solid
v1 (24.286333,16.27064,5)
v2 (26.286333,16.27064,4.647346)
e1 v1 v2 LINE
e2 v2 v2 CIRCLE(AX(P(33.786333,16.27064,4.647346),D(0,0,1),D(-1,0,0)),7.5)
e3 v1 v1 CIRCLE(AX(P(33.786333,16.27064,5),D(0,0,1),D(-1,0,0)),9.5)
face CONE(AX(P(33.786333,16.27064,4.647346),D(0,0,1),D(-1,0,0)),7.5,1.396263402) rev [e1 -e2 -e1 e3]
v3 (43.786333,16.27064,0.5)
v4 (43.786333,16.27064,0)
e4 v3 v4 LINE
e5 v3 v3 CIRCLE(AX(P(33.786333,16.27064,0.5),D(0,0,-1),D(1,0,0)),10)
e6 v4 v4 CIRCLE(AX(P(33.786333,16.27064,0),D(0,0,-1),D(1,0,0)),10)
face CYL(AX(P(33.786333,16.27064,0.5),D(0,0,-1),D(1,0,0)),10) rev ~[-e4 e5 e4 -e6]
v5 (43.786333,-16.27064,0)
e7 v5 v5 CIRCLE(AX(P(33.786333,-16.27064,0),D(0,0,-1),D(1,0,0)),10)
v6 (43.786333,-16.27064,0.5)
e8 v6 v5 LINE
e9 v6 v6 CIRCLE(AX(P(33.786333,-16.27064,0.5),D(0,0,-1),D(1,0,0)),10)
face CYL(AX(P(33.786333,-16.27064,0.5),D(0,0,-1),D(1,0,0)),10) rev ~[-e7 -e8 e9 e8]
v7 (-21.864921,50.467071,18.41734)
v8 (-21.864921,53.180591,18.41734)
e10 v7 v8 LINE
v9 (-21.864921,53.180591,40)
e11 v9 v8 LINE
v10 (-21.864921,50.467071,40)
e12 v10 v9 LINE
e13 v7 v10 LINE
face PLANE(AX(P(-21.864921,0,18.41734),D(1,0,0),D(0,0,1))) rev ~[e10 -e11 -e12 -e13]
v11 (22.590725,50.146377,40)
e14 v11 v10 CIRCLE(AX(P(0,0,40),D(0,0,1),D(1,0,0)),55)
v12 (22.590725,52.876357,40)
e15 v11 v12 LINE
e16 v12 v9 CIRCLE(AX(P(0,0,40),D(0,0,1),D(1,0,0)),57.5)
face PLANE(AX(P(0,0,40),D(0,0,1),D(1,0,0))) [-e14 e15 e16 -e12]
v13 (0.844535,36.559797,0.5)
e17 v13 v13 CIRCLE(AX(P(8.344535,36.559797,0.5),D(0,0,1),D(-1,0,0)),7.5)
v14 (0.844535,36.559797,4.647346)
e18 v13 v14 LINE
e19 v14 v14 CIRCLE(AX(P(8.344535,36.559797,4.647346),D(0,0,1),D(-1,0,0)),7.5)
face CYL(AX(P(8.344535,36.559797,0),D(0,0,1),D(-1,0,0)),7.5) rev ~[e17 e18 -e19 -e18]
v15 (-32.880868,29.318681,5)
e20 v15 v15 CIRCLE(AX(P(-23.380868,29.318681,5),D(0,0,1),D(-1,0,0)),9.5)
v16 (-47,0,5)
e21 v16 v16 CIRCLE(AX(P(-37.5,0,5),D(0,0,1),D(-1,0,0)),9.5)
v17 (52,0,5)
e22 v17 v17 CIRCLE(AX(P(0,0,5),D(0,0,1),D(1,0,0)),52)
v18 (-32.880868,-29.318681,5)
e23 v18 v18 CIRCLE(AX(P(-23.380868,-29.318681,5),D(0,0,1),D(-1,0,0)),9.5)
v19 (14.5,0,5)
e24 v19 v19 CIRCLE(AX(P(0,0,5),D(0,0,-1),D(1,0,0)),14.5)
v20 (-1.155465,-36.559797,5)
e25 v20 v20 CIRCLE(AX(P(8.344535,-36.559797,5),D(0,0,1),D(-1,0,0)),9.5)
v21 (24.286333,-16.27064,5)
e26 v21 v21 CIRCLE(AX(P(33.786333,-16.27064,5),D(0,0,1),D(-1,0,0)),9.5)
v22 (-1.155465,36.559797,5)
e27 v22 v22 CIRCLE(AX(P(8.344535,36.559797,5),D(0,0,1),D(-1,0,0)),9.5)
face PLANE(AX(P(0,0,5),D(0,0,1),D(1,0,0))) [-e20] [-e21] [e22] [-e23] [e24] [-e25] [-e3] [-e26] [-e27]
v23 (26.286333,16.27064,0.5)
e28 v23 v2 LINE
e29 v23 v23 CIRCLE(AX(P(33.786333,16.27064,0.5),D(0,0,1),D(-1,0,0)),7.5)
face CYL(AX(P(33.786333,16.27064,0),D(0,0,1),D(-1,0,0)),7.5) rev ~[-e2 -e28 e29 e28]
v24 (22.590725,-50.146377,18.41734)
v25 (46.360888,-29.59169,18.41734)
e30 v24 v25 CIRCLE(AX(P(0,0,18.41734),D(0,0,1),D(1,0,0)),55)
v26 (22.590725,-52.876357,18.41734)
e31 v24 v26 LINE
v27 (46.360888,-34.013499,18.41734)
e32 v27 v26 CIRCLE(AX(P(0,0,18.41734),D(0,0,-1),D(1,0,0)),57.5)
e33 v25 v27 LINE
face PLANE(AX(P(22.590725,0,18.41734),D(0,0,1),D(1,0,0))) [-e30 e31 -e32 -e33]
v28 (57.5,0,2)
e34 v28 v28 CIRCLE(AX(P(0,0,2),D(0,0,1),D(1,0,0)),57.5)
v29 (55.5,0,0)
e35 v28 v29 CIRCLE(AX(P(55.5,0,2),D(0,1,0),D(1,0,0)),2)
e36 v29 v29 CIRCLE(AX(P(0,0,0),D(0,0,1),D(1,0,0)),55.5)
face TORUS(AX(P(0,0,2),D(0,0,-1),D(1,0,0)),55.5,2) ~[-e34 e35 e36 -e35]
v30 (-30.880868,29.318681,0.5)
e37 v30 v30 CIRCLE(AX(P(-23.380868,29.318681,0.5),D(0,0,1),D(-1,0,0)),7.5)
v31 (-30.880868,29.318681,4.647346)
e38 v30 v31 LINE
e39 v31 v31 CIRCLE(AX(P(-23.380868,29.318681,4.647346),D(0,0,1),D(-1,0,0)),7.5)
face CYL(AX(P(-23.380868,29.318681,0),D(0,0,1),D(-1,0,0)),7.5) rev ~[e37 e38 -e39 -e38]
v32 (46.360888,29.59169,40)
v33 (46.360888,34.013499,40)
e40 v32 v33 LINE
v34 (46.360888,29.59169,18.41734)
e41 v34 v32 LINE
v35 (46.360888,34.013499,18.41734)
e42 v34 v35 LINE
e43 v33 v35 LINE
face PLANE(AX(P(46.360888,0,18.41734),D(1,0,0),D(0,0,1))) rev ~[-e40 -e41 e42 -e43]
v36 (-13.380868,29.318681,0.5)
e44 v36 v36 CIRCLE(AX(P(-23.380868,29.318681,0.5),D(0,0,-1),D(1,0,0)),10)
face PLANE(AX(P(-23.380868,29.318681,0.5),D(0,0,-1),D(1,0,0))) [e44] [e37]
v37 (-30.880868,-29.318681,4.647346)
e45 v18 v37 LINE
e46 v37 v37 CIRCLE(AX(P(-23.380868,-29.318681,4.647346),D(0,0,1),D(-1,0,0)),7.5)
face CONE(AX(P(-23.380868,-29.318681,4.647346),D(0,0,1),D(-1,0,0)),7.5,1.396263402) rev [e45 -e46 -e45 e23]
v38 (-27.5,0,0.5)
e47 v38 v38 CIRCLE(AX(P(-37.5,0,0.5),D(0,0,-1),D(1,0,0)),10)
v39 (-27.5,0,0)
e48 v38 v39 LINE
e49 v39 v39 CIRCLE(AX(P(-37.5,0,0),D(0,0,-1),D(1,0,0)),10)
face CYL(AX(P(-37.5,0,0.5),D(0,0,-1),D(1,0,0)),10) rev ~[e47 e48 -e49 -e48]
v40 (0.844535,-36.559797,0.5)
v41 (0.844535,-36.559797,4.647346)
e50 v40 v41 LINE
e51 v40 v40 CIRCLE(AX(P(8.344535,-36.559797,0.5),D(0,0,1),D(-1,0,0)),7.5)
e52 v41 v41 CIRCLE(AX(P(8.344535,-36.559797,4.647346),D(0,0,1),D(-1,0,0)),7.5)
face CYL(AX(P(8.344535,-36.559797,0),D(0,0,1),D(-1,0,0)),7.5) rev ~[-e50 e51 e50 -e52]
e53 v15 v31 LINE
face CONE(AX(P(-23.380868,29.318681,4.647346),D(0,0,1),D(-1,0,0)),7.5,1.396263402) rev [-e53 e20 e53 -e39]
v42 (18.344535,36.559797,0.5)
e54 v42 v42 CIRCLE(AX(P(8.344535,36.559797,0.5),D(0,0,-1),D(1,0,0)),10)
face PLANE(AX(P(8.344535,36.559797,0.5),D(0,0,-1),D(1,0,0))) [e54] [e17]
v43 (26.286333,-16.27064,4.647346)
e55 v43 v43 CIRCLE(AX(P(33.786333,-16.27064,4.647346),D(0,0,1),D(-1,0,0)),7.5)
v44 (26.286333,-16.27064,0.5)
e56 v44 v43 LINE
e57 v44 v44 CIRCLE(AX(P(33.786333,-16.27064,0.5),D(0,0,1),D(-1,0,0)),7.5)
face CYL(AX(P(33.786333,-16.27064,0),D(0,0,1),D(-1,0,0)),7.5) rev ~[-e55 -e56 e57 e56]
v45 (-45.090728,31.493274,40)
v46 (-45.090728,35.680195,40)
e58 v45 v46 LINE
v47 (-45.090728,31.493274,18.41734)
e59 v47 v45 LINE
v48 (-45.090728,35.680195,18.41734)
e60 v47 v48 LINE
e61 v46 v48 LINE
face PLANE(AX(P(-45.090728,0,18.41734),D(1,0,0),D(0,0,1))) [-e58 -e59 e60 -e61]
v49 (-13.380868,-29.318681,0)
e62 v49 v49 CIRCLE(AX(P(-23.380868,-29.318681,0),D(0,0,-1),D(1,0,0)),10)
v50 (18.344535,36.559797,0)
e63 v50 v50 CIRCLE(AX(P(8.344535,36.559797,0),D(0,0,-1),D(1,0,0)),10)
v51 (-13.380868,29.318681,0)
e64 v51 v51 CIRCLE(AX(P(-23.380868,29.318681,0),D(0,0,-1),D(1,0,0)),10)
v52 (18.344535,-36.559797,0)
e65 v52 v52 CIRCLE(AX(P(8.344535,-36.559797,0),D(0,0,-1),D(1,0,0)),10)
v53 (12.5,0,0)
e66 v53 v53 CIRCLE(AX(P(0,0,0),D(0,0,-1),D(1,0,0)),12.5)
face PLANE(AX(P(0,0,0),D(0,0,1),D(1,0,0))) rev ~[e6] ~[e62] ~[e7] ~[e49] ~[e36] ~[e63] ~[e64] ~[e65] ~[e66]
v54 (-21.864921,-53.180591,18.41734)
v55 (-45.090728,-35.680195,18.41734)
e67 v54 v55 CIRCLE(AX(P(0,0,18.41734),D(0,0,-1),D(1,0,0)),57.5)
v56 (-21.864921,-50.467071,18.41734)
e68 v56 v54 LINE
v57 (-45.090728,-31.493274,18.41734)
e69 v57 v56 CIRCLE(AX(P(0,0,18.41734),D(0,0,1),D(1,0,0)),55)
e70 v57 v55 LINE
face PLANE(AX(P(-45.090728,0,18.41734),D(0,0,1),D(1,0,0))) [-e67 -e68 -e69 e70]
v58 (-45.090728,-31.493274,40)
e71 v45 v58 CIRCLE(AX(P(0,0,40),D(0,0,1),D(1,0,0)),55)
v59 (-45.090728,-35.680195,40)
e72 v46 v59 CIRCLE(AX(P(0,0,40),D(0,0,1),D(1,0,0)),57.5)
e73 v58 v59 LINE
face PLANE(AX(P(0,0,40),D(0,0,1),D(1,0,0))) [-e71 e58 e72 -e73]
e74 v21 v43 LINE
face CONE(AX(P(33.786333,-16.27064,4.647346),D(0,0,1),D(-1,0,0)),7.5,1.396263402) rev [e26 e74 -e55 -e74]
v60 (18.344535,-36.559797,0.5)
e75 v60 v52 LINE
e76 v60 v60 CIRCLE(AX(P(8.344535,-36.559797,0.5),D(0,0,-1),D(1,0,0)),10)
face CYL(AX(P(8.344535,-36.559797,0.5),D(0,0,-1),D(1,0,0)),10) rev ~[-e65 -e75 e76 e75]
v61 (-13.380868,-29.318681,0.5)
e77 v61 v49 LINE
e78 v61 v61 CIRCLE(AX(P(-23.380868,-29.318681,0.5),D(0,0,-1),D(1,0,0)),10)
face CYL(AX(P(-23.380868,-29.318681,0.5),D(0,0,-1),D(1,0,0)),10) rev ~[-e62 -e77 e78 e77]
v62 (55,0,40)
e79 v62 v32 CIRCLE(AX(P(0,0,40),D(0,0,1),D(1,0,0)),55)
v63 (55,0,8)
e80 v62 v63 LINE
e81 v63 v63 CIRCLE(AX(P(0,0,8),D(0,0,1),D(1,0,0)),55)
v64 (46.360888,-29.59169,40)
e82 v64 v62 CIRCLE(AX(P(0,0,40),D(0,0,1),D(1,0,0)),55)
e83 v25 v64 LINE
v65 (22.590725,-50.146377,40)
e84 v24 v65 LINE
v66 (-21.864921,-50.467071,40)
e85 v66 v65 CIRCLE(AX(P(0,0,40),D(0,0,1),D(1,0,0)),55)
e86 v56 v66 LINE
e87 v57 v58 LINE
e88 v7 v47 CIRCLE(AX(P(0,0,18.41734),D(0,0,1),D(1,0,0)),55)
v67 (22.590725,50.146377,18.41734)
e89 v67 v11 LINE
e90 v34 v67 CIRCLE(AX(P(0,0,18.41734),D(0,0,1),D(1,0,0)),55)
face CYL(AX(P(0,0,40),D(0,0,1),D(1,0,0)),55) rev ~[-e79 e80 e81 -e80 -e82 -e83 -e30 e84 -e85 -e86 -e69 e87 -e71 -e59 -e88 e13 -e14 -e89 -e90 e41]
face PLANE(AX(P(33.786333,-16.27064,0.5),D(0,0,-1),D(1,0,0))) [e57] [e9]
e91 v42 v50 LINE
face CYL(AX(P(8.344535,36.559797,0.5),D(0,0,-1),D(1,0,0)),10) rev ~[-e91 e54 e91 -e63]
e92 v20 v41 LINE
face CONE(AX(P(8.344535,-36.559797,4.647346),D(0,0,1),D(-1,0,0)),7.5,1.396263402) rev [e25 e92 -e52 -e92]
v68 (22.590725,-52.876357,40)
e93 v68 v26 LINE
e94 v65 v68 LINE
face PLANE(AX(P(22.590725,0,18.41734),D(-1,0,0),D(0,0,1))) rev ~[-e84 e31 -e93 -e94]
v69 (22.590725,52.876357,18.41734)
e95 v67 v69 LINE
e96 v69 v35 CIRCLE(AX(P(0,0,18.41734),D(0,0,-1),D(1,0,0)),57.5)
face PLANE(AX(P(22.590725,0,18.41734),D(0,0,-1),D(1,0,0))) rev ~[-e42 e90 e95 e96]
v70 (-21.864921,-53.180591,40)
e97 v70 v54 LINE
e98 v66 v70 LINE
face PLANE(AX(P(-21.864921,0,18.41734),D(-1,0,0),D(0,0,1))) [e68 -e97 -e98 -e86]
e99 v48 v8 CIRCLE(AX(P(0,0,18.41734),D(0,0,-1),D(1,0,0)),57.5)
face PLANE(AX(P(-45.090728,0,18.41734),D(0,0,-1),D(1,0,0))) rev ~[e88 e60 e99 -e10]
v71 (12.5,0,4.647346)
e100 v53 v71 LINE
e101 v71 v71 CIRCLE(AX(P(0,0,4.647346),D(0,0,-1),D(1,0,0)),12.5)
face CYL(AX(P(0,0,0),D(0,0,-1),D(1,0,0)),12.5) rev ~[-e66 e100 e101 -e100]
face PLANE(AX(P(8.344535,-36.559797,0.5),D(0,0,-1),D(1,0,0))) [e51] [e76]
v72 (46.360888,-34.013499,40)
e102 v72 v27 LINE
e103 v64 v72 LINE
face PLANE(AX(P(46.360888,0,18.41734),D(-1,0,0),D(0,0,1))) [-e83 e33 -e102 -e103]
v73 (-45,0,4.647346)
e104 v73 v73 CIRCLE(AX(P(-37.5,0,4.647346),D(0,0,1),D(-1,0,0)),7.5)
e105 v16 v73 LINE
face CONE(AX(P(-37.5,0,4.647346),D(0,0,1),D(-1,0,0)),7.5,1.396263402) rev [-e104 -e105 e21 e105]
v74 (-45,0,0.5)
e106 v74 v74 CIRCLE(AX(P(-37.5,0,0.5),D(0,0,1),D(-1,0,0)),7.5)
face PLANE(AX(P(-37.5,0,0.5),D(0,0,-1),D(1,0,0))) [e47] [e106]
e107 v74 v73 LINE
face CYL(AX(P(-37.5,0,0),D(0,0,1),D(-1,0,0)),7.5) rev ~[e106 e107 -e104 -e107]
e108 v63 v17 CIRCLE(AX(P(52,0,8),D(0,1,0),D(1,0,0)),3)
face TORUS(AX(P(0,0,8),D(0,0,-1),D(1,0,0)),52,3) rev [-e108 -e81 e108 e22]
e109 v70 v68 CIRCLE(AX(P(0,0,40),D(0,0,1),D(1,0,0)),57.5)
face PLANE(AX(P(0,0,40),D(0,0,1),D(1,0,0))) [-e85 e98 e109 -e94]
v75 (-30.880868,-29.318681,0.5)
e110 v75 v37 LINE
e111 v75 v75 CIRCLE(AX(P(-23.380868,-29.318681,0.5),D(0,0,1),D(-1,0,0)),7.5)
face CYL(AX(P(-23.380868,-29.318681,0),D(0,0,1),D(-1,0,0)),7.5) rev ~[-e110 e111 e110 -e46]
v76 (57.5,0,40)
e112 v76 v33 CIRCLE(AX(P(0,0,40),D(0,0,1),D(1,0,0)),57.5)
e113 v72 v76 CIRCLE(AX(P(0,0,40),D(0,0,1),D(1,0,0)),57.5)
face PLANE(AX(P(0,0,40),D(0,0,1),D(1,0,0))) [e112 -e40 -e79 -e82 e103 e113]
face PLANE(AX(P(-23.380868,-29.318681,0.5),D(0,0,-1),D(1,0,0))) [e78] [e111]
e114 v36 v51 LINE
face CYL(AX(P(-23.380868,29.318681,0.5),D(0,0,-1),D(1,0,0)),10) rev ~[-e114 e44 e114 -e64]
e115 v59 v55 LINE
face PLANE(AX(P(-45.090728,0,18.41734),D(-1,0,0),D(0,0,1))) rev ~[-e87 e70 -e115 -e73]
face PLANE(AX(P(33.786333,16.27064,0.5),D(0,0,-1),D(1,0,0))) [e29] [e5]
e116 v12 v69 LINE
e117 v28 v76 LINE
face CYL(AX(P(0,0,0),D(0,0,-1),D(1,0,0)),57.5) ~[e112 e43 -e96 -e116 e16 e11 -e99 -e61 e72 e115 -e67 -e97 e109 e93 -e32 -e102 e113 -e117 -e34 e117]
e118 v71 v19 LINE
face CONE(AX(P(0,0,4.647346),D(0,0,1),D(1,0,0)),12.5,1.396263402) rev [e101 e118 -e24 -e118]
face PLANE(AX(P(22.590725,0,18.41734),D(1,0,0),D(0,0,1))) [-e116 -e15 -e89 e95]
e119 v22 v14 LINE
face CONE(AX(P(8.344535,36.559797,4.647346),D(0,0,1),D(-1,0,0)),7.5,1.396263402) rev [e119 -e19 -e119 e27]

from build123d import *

# Parameters (mm, degrees)
F0_R           = 57.5
F1_DEPTH       = 40
F2_R           = 55
F3_DEPTH       = 35
F4_R           = 3
F5_R           = 2
F6_R           = 12.5
F7_DEPTH       = 40.001
F9_D           = 15
F9_CBORE_D     = 20
F9_CBORE_DEPTH = 0.5
F10_C1_SIZE2   = 2
F10_C1_SIZE    = 0.3526539614
F10_C2_SIZE2   = 0.3526539614
F10_C2_SIZE    = 2
F10_C3_SIZE2   = 0.3526539614
F10_C3_SIZE    = 2
F10_C4_SIZE2   = 0.3526539614
F10_C4_SIZE    = 2
F10_C5_SIZE2   = 0.3526539614
F10_C5_SIZE    = 2
F10_C6_SIZE2   = 0.3526539614
F10_C6_SIZE    = 2
F10_C7_SIZE2   = 0.3526539614
F10_C7_SIZE    = 2
F10_C8_SIZE2   = 0.3526539614
F10_C8_SIZE    = 2
F11_W          = 23.2258066535
F11_H          = 27.9435478151
F11_W_2        = 23.7701628357
F11_H_2        = 28.1250029802
F12_DEPTH      = 57.5010001
F12_DEPTH_BACK = 57.5010001


with BuildPart() as f1:
    # F0 (on Top) → F1 (new body)
    with BuildSketch(Plane.XY):
        Circle(F0_R)
    extrude(amount=F1_DEPTH)

    # F2 (on face) → F3 (cut)
    with BuildSketch(Plane.XY.offset(40)):
        Circle(F2_R)
    extrude(amount=-F3_DEPTH, mode=Mode.SUBTRACT)

    # F4
    f4_edges = [f1.edges().sort_by_distance(p)[0] for p in [
        (-55, 0, 5),
    ]]
    fillet(f4_edges, radius=F4_R)

    # F5
    f5_edges = [f1.edges().sort_by_distance(p)[0] for p in [
        (-57.5, 0, 0),
    ]]
    fillet(f5_edges, radius=F5_R)

    # F6 (on face) → F7 (cut, through all)
    with BuildSketch(Plane(origin=(0, 0, 0), x_dir=(1, 0, 0), z_dir=(0, 0, -1))):
        Circle(F6_R)
    extrude(amount=-F7_DEPTH, mode=Mode.SUBTRACT)

    # F9 (through all)
    with Locations(Plane(origin=(0, 0, 0), x_dir=(1, 0, 0), z_dir=(0, 0, -1))):
        with Locations((-37.5, 0), (-23.3808675697, 29.3186805926), (8.3445350234, 36.5597967068), (33.7863325463, 16.2706402169), (33.7863325463, -16.2706402169), (8.3445350234, -36.5597967068), (-23.3808675697, -29.3186805926)):
            CounterBoreHole(F9_D / 2, F9_CBORE_D / 2, F9_CBORE_DEPTH)

    # F10: chamfer of 2 x 0.3526539614 on 8 edges, made by hand

    # F10_c1
    f10_c1_edges = [f1.edges().sort_by_distance(p)[0] for p in [
        (-12.5, 0, 5),
    ]]
    f10_c1_side = f1.faces().sort_by_distance((-12.5, 0, 4.9929469208))[0]
    chamfer(f10_c1_edges, length=F10_C1_SIZE, length2=F10_C1_SIZE2, reference=f10_c1_side)

    # F10_c2
    f10_c2_edges = [f1.edges().sort_by_distance(p)[0] for p in [
        (-30.8808675697, -29.3186805926, 5),
    ]]
    f10_c2_side = f1.faces().sort_by_distance((-30.8879206489, -29.3186805926, 5))[0]
    chamfer(f10_c2_edges, length=F10_C2_SIZE, length2=F10_C2_SIZE2, reference=f10_c2_side)

    # F10_c3
    f10_c3_edges = [f1.edges().sort_by_distance(p)[0] for p in [
        (0.8445350234, -36.5597967068, 5),
    ]]
    f10_c3_side = f1.faces().sort_by_distance((0.8374819441, -36.5597967068, 5))[0]
    chamfer(f10_c3_edges, length=F10_C3_SIZE, length2=F10_C3_SIZE2, reference=f10_c3_side)

    # F10_c4
    f10_c4_edges = [f1.edges().sort_by_distance(p)[0] for p in [
        (26.2863325463, -16.2706402169, 5),
    ]]
    f10_c4_side = f1.faces().sort_by_distance((26.2792794671, -16.2706402169, 5))[0]
    chamfer(f10_c4_edges, length=F10_C4_SIZE, length2=F10_C4_SIZE2, reference=f10_c4_side)

    # F10_c5
    f10_c5_edges = [f1.edges().sort_by_distance(p)[0] for p in [
        (-45, 0, 5),
    ]]
    f10_c5_side = f1.faces().sort_by_distance((-45.0070530792, 0, 5))[0]
    chamfer(f10_c5_edges, length=F10_C5_SIZE, length2=F10_C5_SIZE2, reference=f10_c5_side)

    # F10_c6
    f10_c6_edges = [f1.edges().sort_by_distance(p)[0] for p in [
        (-30.8808675697, 29.3186805926, 5),
    ]]
    f10_c6_side = f1.faces().sort_by_distance((-30.8879206489, 29.3186805926, 5))[0]
    chamfer(f10_c6_edges, length=F10_C6_SIZE, length2=F10_C6_SIZE2, reference=f10_c6_side)

    # F10_c7
    f10_c7_edges = [f1.edges().sort_by_distance(p)[0] for p in [
        (26.2863325463, 16.2706402169, 5),
    ]]
    f10_c7_side = f1.faces().sort_by_distance((26.2792794671, 16.2706402169, 5))[0]
    chamfer(f10_c7_edges, length=F10_C7_SIZE, length2=F10_C7_SIZE2, reference=f10_c7_side)

    # F10_c8
    f10_c8_edges = [f1.edges().sort_by_distance(p)[0] for p in [
        (0.8445350234, 36.5597967068, 5),
    ]]
    f10_c8_side = f1.faces().sort_by_distance((0.8374819441, 36.5597967068, 5))[0]
    chamfer(f10_c8_edges, length=F10_C8_SIZE, length2=F10_C8_SIZE2, reference=f10_c8_side)

    # F11 (on Front) → F12 (cut, two sides)
    with BuildSketch(Plane.XZ) as f12_sk:
        with Locations((-33.4778241813, 32.3891136795)):
            Rectangle(F11_W, F11_H)
        with Locations((34.4758061692, 32.4798412621)):
            Rectangle(F11_W_2, F11_H_2)
    extrude(amount=F12_DEPTH, mode=Mode.SUBTRACT)
    extrude(f12_sk.sketch, amount=-F12_DEPTH_BACK, mode=Mode.SUBTRACT)


solid = f1.part
